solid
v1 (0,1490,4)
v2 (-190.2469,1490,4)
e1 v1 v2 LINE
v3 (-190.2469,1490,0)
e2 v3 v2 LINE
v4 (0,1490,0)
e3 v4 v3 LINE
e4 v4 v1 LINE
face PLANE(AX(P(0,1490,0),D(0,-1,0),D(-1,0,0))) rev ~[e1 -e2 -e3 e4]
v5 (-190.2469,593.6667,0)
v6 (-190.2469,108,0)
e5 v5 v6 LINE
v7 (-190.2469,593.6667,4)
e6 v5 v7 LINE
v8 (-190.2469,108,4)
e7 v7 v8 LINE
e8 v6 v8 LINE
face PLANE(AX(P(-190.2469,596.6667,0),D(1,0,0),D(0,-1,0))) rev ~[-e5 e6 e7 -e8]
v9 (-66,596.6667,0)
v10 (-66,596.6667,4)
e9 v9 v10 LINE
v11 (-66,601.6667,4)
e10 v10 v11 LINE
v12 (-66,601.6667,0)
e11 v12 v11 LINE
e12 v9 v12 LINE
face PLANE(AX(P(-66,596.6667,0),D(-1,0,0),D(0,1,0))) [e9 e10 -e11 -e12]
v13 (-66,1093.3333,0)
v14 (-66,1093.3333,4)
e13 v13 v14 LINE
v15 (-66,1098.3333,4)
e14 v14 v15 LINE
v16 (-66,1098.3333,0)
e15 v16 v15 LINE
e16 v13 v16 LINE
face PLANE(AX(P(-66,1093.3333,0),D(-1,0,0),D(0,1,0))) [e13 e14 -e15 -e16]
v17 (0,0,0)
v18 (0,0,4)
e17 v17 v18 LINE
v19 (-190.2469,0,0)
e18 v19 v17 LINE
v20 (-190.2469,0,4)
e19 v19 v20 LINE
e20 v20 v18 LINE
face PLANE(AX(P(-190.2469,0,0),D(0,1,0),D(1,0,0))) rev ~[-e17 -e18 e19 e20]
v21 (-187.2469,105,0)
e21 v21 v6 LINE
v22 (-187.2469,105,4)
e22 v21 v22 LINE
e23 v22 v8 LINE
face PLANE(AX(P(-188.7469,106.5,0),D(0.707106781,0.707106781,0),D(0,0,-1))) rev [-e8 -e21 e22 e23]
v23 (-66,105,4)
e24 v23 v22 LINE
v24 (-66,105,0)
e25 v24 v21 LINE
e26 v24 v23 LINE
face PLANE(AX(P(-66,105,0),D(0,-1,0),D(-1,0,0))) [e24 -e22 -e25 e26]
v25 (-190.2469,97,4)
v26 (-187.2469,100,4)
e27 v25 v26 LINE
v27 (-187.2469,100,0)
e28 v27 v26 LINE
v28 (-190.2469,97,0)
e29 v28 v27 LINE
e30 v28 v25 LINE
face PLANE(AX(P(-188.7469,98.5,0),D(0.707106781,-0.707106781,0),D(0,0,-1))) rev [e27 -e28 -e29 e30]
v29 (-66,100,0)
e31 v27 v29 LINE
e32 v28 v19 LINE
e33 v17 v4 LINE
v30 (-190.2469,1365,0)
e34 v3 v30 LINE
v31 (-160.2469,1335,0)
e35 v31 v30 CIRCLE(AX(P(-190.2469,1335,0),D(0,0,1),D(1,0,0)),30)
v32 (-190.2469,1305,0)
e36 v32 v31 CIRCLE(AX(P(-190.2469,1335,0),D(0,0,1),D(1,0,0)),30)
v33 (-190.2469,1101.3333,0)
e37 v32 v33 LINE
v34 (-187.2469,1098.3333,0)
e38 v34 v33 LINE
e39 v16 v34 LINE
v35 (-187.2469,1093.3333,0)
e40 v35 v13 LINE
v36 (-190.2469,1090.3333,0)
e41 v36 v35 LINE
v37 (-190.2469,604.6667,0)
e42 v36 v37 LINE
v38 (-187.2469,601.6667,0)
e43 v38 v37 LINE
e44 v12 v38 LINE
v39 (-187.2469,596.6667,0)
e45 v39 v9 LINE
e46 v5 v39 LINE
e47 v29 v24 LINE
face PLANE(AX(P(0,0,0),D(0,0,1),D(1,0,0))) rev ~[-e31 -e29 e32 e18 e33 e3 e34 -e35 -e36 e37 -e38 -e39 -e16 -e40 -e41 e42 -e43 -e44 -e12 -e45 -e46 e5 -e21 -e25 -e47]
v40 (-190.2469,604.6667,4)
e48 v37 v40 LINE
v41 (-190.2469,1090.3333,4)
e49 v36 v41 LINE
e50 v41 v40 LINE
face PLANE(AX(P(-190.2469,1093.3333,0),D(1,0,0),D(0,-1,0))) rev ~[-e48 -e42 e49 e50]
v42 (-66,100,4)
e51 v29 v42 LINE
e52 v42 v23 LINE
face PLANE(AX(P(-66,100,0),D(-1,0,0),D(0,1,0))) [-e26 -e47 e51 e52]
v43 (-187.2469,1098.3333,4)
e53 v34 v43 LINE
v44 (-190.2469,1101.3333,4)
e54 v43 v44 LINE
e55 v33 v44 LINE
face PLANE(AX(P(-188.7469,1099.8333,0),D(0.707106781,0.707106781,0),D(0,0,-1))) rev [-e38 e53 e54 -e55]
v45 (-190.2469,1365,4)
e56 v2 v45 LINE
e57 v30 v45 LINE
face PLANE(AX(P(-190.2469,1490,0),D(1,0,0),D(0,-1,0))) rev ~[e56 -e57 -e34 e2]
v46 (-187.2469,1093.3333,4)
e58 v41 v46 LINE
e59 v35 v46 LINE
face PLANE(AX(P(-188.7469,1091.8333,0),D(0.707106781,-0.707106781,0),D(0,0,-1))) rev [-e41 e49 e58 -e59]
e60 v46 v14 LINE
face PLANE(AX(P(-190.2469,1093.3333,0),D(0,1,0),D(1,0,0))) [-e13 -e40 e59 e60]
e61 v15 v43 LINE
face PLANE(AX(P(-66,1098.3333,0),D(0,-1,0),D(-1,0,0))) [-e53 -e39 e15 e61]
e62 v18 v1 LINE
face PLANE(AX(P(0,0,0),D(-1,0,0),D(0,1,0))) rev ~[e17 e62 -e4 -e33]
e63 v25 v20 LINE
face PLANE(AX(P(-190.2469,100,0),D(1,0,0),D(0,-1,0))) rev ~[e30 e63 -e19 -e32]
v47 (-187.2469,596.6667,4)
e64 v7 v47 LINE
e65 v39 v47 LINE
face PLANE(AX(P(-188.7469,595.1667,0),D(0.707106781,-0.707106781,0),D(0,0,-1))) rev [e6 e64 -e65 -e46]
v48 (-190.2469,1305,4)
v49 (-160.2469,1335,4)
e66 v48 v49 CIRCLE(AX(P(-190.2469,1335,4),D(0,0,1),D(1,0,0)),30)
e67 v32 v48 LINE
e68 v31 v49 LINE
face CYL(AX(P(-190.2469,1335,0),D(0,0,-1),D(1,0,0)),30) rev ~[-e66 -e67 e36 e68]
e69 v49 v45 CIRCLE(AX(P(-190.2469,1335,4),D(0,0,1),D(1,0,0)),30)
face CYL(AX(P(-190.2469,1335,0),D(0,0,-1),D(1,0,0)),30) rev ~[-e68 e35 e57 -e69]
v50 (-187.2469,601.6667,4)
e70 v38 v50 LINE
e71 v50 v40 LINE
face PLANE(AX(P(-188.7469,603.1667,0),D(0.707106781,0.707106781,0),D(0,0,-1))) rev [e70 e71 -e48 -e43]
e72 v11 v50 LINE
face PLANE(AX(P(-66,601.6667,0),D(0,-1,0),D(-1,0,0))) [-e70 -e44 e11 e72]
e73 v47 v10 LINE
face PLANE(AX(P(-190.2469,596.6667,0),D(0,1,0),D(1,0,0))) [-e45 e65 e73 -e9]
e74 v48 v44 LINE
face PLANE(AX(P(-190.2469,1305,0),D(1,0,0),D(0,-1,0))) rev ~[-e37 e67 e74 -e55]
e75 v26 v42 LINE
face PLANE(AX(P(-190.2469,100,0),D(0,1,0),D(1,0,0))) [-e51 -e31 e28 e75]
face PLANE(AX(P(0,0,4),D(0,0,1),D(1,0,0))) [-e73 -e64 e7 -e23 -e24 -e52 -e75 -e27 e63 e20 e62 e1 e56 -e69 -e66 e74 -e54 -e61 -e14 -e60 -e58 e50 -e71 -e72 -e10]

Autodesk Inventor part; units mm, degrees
ref_plane "YZ Plane" through (0, 0, 0) normal (1, 0, 0) x (0, 1, 0)
ref_plane "XZ Plane" through (0, 0, 0) normal (0, 1, 0) x (-1, 0, 0)
ref_plane "XY Plane" through (0, 0, 0) normal (0, 0, 1) x (1, 0, 0)
sketch "Sketch1" plane through (0, 0, 0) normal (0, 0, 1) x (1, 0, 0)
  line L0 (0, 1490) -> (-190.2469, 1490)
  line L1 (-190.2469, 1490) -> (-190.2469, 0)
  line L2 (-190.2469, 0) -> (0, 0)
  line L3 (0, 0) -> (0, 1490)
  line L4 (-190.2469, 100) -> (-66, 100)
  line L5 (-66, 100) -> (-66, 105)
  line L6 (-66, 105) -> (-190.2469, 105)
  line L7 (-190.2469, 105) -> (-190.2469, 100)
  line L8 (-190.2469, 596.6667) -> (-66, 596.6667)
  line L9 (-66, 596.6667) -> (-66, 601.6667)
  line L10 (-66, 601.6667) -> (-190.2469, 601.6667)
  line L11 (-190.2469, 601.6667) -> (-190.2469, 596.6667)
  line L12 (-190.2469, 1093.3333) -> (-66, 1093.3333)
  line L13 (-66, 1093.3333) -> (-66, 1098.3333)
  line L14 (-66, 1098.3333) -> (-190.2469, 1098.3333)
  line L15 (-190.2469, 1098.3333) -> (-190.2469, 1093.3333)
  circle A0 centre (-190.2469, 1335) radius 30
  point P0 (-190.2469, 1098.3333)
  point P1 (-190.2469, 1093.3333)
  point P2 (-190.2469, 601.6667)
  point P3 (-190.2469, 596.6667)
  point P4 (-190.2469, 1365)
  point P5 (-190.2469, 1305)
  dimension "d0" = 1490
  dimension "d1" = 190.2469
  dimension "d2" = 5
  dimension "d4" = 100
  dimension "d7" = 496.6667
  dimension "d23" = 66
  dimension "d29" = 60
  dimension "d30" = 1335
extrude "Plate1" add sketch "Sketch1" along normal blind 4 contours L3 L2 L1 L4 L5 L6 L8 L9 L10 L12 L13 L14 A0 L0
chamfer "Corner Chamfer1" distance 3 angle 45 6 edges at (-190.2469, 100, 2) (-190.2469, 105, 2) (-190.2469, 596.6667, 2) (-190.2469, 601.6667, 2) (-190.2469, 1098.3333, 2) (-190.2469, 1093.3333, 2)
equation "\"d0\" = Стрингер_длина"
equation "\"d1\" = стрингер_глубина_1"
equation "\"d2\" = паз_под_стрингер_толщина"
equation "\"d7\" = Шаг_шпангоутов"
equation "\"d23\" = паз_под_стрингер_глубина - Thickness"
equation "\"d29\" = 2 * радиус_выреза_под_сварку"
equation "\"d12\" = Thickness"
equation "\"BendRadius\" = Thickness"
equation "\"BendReliefWidth\" = Thickness"
equation "\"BendReliefDepth\" = 0.5 * Thickness"
equation "\"CornerReliefSize\" = 4 * Thickness"
equation "\"MinimumRemnant\" = 2 * Thickness"
equation "\"TransitionRadius\" = BendRadius"
equation "\"JacobiRadiusSize\" = BendRadius"
equation "\"GapSize\" = Thickness"
equation "\"Стрингер_длина\" = 1490"
equation "\"стрингер_глубина_1\" = 190.246925"
equation "\"паз_под_стрингер_толщина\" = 5"
equation "\"Шаг_шпангоутов\" = 496.666667"
equation "\"паз_под_стрингер_глубина\" = 70"
equation "\"Thickness\" = 4"
equation "\"радиус_выреза_под_сварку\" = 30"
properties part number "0413 GBK stringer C1" material "Steel"
